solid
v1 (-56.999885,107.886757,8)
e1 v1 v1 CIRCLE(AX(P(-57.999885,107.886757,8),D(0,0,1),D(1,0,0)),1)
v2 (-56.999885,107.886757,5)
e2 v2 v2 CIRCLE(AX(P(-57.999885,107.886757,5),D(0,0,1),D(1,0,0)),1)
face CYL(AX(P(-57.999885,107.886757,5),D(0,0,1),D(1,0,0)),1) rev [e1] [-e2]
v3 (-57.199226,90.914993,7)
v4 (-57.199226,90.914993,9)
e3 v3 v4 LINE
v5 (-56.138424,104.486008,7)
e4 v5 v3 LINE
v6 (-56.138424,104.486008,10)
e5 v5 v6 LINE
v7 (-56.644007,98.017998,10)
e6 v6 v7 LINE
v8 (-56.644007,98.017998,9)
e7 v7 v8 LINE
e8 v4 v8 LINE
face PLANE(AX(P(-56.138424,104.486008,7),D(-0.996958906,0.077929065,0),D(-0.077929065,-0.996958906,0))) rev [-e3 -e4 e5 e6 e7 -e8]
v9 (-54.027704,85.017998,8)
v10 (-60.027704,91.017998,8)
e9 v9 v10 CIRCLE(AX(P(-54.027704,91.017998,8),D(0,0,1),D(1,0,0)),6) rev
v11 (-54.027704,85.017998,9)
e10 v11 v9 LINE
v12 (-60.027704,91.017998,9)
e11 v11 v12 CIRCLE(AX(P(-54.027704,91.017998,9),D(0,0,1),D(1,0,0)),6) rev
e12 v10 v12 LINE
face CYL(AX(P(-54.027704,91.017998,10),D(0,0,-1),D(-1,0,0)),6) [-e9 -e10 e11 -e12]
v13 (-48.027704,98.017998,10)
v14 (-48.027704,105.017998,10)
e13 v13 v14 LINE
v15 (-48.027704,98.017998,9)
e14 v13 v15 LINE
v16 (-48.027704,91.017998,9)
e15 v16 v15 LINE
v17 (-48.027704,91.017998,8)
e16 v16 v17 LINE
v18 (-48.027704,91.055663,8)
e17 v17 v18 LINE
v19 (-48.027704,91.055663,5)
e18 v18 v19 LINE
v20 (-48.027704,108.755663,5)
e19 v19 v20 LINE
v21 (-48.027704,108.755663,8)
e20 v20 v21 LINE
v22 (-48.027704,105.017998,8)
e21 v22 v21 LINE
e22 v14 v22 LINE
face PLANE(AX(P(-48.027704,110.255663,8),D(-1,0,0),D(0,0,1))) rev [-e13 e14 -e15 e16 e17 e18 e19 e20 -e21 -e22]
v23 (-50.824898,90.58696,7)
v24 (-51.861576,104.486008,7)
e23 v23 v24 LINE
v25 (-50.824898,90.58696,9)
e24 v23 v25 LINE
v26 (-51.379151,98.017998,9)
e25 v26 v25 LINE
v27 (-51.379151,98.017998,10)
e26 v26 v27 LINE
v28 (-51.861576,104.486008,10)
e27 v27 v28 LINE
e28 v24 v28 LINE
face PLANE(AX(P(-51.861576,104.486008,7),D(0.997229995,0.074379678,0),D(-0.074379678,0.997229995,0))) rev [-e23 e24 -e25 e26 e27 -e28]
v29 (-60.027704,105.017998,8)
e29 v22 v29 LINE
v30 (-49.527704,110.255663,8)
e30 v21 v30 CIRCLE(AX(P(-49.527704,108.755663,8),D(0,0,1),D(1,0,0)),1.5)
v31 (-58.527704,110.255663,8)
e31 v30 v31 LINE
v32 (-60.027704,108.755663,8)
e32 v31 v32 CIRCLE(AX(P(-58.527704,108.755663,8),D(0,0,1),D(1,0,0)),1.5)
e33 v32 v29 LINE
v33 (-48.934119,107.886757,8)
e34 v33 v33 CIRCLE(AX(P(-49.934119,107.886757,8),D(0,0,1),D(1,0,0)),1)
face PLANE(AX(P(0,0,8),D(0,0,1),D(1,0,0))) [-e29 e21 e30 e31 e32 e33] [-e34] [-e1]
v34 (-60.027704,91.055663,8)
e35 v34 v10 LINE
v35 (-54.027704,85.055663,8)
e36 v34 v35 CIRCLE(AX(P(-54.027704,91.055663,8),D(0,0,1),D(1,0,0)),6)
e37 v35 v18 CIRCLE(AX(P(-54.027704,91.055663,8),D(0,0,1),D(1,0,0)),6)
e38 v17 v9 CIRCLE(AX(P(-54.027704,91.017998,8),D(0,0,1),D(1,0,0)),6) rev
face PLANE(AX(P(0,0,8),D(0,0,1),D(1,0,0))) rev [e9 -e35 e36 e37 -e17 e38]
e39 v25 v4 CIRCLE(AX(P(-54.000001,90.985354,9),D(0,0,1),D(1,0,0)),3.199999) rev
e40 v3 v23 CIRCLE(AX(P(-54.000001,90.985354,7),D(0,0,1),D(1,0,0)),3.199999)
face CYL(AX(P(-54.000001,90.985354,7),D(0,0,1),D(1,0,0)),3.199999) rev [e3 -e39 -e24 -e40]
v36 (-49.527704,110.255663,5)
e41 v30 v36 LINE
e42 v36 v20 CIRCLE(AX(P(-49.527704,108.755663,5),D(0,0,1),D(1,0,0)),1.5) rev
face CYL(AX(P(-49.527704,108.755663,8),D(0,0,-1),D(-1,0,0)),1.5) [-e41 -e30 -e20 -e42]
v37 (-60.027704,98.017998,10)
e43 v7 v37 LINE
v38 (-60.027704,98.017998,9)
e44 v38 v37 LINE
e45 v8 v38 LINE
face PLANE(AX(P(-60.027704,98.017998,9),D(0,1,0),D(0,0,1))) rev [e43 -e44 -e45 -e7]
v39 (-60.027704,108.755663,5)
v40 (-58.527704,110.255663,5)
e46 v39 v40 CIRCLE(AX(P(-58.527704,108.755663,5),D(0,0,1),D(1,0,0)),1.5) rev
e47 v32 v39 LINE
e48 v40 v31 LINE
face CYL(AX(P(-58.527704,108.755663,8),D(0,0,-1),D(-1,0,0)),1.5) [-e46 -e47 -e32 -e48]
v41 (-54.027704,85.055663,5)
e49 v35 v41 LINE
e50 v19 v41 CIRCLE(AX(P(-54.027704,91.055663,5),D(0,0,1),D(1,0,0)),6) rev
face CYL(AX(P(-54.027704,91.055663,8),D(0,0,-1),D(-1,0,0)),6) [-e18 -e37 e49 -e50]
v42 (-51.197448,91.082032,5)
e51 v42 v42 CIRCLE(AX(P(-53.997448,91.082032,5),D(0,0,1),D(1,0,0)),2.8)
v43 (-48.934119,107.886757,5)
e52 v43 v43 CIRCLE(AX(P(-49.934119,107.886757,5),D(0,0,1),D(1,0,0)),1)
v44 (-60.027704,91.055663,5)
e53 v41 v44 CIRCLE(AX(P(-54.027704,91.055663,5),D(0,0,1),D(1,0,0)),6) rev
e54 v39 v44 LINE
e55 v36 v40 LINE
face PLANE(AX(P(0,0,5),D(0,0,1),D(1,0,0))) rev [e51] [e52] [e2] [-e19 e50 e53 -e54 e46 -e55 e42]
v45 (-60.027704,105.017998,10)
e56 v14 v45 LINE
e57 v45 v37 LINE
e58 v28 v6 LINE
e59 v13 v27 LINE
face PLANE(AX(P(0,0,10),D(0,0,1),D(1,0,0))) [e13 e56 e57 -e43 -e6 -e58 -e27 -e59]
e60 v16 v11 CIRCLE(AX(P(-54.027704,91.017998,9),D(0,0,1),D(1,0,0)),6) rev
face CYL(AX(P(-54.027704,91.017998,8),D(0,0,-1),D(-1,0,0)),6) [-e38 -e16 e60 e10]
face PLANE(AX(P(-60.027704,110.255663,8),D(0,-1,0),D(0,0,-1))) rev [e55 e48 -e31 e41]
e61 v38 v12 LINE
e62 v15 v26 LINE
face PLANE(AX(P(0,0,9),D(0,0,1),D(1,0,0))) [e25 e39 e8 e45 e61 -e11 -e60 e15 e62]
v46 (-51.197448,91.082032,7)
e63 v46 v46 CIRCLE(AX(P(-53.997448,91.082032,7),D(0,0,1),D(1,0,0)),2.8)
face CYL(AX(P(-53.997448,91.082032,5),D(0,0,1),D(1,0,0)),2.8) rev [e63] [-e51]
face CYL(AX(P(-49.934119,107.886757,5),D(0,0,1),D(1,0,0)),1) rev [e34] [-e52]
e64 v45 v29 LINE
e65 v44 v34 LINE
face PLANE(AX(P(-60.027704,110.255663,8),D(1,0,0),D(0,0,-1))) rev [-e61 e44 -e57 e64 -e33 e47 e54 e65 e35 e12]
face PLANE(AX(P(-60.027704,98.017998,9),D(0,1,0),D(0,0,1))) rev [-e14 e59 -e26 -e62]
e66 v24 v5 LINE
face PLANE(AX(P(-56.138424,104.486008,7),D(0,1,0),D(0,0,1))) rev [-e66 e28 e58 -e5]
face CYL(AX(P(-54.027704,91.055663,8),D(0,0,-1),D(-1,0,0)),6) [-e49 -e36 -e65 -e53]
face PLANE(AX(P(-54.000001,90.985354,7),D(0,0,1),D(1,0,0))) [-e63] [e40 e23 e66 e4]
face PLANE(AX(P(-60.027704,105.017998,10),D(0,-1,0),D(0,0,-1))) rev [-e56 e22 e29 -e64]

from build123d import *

# Parameters (mm, degrees)
SKETCH1_W           = 12
SKETCH1_H           = 25.2
BOSS_EXTRUDE1_DEPTH = 3
FILLET1_R           = 6
SKETCH3_W           = 12
SKETCH3_H           = 20
BOSS_EXTRUDE2_DEPTH = 2
FILLET2_R           = 6
CUT_EXTRUDE1_DEPTH  = 3
SKETCH5_R           = 2.8
CUT_EXTRUDE2_DEPTH  = 126.573231257
SKETCH6_R           = 1
CUT_EXTRUDE3_DEPTH  = 126.573231257
SKETCH7_W           = 12.403914783
SKETCH7_H           = 13.383655683
CUT_EXTRUDE4_DEPTH  = 1
FILLET3_R           = 1.5


with BuildPart() as part:
    # Sketch1 → Boss-Extrude1 (new body)
    with BuildSketch(Plane.XY.offset(5)):
        with Locations((-54.027704131, 97.655662644)):
            Rectangle(SKETCH1_W, SKETCH1_H)
    extrude(amount=BOSS_EXTRUDE1_DEPTH)

    # Fillet1
    fillet1_edges = [part.edges().sort_by_distance(p)[0] for p in [
        (-48.027704131, 85.055662644, 6.5),
        (-60.027704131, 85.055662644, 6.5),
    ]]
    fillet(fillet1_edges, radius=FILLET1_R - 0.0001)  # a hair under: the kernel refuses the full size

    # Sketch3 → Boss-Extrude2 (add)
    with BuildSketch(Plane.XY.offset(8)):
        with Locations((-54.027704131, 95.017998247)):
            Rectangle(SKETCH3_W, SKETCH3_H)
    extrude(amount=BOSS_EXTRUDE2_DEPTH)

    # Fillet2
    fillet2_edges = [part.edges().sort_by_distance(p)[0] for p in [
        (-48.027704131, 85.017998247, 9),
        (-60.027704131, 85.017998247, 9),
    ]]
    fillet(fillet2_edges, radius=FILLET2_R - 0.0001)  # a hair under: the kernel refuses the full size

    # Sketch4 → Cut-Extrude1 (cut, symmetric)
    with BuildSketch(Plane.XY.offset(10)):
        with BuildLine():
            Line((-56.13842392, 104.48600769), (-51.86157608, 104.48600769))
            Line((-51.86157608, 104.48600769), (-50.824897766, 90.586959839))
            ThreePointArc((-50.824897766, 90.586959839), (-54.164460237, 87.789583498), (-57.199226379, 90.914993286))
            Line((-57.199226379, 90.914993286), (-56.13842392, 104.48600769))
        make_face()
    extrude(amount=CUT_EXTRUDE1_DEPTH, both=True, mode=Mode.SUBTRACT)

    # Sketch5 → Cut-Extrude2 (cut, through all)
    with BuildSketch(Plane.XY.offset(7)):
        with Locations((-53.997448325, 91.08203191)):
            Circle(SKETCH5_R)
    extrude(amount=-CUT_EXTRUDE2_DEPTH, mode=Mode.SUBTRACT)

    # Sketch6 → Cut-Extrude3 (cut, through all)
    with BuildSketch(Plane.XY.offset(8)):
        with Locations((-57.999885247, 107.886757068)):
            Circle(SKETCH6_R)
        with Locations((-49.934118523, 107.886757068)):
            Circle(SKETCH6_R)
    extrude(amount=-CUT_EXTRUDE3_DEPTH, mode=Mode.SUBTRACT)

    # Sketch7 → Cut-Extrude4 (cut)
    with BuildSketch(Plane.XY.offset(10)):
        with Locations((-53.82574674, 91.326170406)):
            Rectangle(SKETCH7_W, SKETCH7_H)
    extrude(amount=-CUT_EXTRUDE4_DEPTH, mode=Mode.SUBTRACT)

    # Fillet3
    fillet3_edges = [part.edges().sort_by_distance(p)[0] for p in [
        (-60.027704131, 110.255662644, 6.5),
        (-48.027704131, 110.255662644, 6.5),
    ]]
    fillet(fillet3_edges, radius=FILLET3_R)


solid = part.part
